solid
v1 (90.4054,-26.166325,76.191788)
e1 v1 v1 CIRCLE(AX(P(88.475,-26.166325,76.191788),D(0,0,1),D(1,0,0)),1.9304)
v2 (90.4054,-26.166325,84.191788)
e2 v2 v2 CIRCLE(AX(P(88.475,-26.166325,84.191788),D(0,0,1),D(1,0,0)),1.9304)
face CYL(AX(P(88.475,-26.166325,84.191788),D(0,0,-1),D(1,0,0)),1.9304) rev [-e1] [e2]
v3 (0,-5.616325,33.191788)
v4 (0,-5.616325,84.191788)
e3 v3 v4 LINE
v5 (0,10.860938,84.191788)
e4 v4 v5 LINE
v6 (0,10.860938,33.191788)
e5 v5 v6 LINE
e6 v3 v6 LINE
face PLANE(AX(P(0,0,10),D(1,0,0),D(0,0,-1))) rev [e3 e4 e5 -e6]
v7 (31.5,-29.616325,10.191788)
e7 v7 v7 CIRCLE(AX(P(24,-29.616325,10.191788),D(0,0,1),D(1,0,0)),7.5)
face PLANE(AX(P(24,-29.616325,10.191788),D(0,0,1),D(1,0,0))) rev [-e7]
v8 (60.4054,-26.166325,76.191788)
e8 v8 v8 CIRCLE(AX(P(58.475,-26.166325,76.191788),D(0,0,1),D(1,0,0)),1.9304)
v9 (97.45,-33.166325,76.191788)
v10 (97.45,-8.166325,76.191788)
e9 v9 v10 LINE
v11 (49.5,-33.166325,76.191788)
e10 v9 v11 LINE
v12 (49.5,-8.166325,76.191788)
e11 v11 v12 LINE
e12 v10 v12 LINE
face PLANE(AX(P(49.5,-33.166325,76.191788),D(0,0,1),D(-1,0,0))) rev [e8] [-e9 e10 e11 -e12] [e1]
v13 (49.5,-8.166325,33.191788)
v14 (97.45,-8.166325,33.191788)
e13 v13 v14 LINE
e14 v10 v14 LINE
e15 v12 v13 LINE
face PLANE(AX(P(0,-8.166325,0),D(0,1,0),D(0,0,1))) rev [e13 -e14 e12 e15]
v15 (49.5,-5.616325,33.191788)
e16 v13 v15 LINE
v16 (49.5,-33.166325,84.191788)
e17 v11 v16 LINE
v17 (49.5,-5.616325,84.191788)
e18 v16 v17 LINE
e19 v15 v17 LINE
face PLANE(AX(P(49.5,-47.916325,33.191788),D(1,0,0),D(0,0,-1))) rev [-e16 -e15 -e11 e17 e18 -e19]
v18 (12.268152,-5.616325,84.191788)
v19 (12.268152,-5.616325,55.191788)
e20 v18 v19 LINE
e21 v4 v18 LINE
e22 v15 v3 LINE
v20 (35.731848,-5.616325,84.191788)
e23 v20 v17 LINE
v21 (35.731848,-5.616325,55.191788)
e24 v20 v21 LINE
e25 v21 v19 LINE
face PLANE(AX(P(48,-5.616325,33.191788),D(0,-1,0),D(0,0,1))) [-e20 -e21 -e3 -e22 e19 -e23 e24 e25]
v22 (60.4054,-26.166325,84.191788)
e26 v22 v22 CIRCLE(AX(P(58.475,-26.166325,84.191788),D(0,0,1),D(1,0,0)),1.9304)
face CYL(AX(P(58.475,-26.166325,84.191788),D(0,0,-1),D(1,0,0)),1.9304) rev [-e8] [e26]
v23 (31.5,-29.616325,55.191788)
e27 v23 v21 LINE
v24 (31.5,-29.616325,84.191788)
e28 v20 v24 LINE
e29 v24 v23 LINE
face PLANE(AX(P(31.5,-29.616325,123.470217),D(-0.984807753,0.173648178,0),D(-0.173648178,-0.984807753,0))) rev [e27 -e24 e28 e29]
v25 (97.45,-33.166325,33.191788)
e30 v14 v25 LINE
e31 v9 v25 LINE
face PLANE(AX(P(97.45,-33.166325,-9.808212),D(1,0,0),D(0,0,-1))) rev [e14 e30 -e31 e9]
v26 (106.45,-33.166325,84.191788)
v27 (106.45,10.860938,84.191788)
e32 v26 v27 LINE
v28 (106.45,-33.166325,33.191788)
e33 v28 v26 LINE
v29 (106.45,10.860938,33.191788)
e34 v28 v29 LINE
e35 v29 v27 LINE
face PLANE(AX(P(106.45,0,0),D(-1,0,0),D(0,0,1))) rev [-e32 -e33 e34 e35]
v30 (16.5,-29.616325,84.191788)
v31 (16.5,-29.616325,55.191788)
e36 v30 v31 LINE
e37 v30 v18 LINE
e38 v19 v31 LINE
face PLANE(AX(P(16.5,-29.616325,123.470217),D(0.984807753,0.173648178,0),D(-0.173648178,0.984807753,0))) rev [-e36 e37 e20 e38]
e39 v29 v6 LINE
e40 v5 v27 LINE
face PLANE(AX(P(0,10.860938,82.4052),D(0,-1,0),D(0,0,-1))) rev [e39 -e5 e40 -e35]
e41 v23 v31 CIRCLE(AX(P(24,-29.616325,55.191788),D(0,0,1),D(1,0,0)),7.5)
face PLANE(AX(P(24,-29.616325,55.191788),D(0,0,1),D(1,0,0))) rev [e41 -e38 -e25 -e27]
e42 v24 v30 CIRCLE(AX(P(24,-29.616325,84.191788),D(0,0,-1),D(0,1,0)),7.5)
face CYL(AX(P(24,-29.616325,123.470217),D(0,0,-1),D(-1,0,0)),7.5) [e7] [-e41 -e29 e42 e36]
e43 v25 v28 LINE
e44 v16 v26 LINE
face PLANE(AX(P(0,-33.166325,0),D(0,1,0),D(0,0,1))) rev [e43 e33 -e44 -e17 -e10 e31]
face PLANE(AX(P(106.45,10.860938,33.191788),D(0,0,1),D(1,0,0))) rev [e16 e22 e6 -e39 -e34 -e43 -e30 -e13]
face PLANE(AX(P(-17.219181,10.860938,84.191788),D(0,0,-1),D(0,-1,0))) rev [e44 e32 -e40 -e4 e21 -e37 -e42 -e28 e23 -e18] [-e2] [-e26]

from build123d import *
from build123d.topology import SkipClean

# Parameters (mm, degrees)
SKETCH1_W             = 48
SKETCH1_H             = 53
BOSS_EXTRUDE1_DEPTH   = 10
SKETCH2_W             = 48
SKETCH2_H             = 5.616325
BOSS_EXTRUDE2_DEPTH   = 33.1917878
SKETCH4_W             = 4
SKETCH4_H             = 10
BOSS_EXTRUDE4_DEPTH   = 40
SKETCH5_W             = 48
SKETCH5_H             = 10.8609375
BOSS_EXTRUDE5_DEPTH   = 23.1917878
SKETCH6_W             = 48
SKETCH6_H             = 5
BOSS_EXTRUDE6_DEPTH   = 42.3
SKETCH7_W             = 12.8082122
SKETCH7_H             = 16.4772625
BOSS_EXTRUDE7_DEPTH   = 48
CUT_EXTRUDE1_REACH    = 84.426
SKETCH8_R             = 11.5
SKETCH8_R_2           = 2
FILLET1_R             = 10
FILLET2_R             = 4
SKETCH9_W             = 5
SKETCH9_H             = 16.4772625
BOSS_EXTRUDE9_DEPTH   = 48
CUT_EXTRUDE2_DEPTH    = 88.252507127
SKETCH11_W            = 51
SKETCH11_H            = 16.4772625
BOSS_EXTRUDE10_DEPTH  = 49.45
BOSS_EXTRUDE11_DEPTH  = 46
SKETCH16_W            = 47.95
SKETCH16_H            = 51
BOSS_EXTRUDE14_DEPTH  = 2.55
SKETCH14_W            = 5
SKETCH14_H            = 42.3
BOSS_EXTRUDE13_DEPTH  = 1.5
SKETCH17_W            = 51
SKETCH17_H            = 19.0272625
BOSS_EXTRUDE15_DEPTH  = 9
BOSS_EXTRUDE16_DEPTH  = 25
SKETCH19_R            = 1.9304
CUT_EXTRUDE3_DEPTH    = 125.404890183
MIRROR2_START         = 33.1917878
MIRROR2_DEPTH         = 51
MIRROR2_START_2       = 76.1917878
MIRROR2_2_OUTLINE_W   = 47.95
MIRROR2_2_OUTLINE_H   = 25
MIRROR2_2_OUTLINE_R   = 1.9304
MIRROR2_2_DEPTH       = 8
MIRROR2_3_OUTLINE_W   = 45
MIRROR2_3_OUTLINE_H   = 42.3
MIRROR2_3_OUTLINE_R   = 2
MIRROR2_3_OUTLINE_R_2 = 11.5
MIRROR2_3_DEPTH       = 5
SKETCH20_W            = 103.287975037
SKETCH20_H            = 97.84889924
CUT_EXTRUDE4_DEPTH    = 144.929961559
SKETCH21_W            = 49.5
SKETCH21_H            = 42.3
CUT_EXTRUDE5_DEPTH    = 128.391431036
SKETCH24_R            = 7.5
BOSS_EXTRUDE18_DEPTH  = 45
BOSS_EXTRUDE19_DEPTH  = 29


# Read off the part's stored shape, not the designer's step: Mirror2
with BuildPart() as part:
    # Sketch1 → Boss-Extrude1 (new body)
    with BuildSketch(Plane.XY):
        with Locations((24, 26.5)):
            Rectangle(SKETCH1_W, SKETCH1_H)
    extrude(amount=BOSS_EXTRUDE1_DEPTH)

    # Sketch2 → Boss-Extrude2 (add)
    with BuildSketch(Plane(origin=(0, 0, 0), x_dir=(-1, 0, 0), z_dir=(0, 0, -1))):
        with Locations((-24, -2.8081625)):
            Rectangle(SKETCH2_W, SKETCH2_H)
    extrude(amount=-BOSS_EXTRUDE2_DEPTH)

    # Sketch4 → Boss-Extrude4 (add)
    with BuildSketch(Plane.XY.offset(10)):
        with Locations((2, 48)):
            Rectangle(SKETCH4_W, SKETCH4_H)
        with Locations((46, 48)):
            Rectangle(SKETCH4_W, SKETCH4_H)
    extrude(amount=BOSS_EXTRUDE4_DEPTH)

    # Sketch5 → Boss-Extrude5 (add)
    with BuildSketch(Plane.XY.offset(10)):
        with Locations((24, 5.43046875)):
            Rectangle(SKETCH5_W, SKETCH5_H)
    extrude(amount=BOSS_EXTRUDE5_DEPTH)

    # Sketch6 → Boss-Extrude6 (add)
    with BuildSketch(Plane.XZ.offset(5.616325)):
        with Locations((24, 30.6917878)):
            Rectangle(SKETCH6_W, SKETCH6_H)
    extrude(amount=BOSS_EXTRUDE6_DEPTH)

    # Sketch7 → Boss-Extrude7 (add)
    with BuildSketch(Plane.ZY):
        with Locations((-6.4041061, 2.62230625)):
            Rectangle(SKETCH7_W, SKETCH7_H)
    extrude(amount=-BOSS_EXTRUDE7_DEPTH)

    # Sketch8 → Cut-Extrude1 (cut, up to next)
    with BuildSketch(Plane(origin=(0, 0, 28.1917878), x_dir=(-1, 0, 0), z_dir=(0, 0, -1)), mode=Mode.PRIVATE) as cut_extrude1_sk1:
        with Locations((-24, -26.616325)):
            Circle(SKETCH8_R)
    cut_extrude1_tool1 = extrude(cut_extrude1_sk1.sketch, amount=-CUT_EXTRUDE1_REACH, mode=Mode.PRIVATE) & part.part
    # Sketch8 → Cut-Extrude1 (cut, up to next)
    with BuildSketch(Plane(origin=(0, 0, 28.1917878), x_dir=(-1, 0, 0), z_dir=(0, 0, -1)), mode=Mode.PRIVATE) as cut_extrude1_sk2:
        with Locations((-39.5, -11.116325)):
            Circle(SKETCH8_R_2)
    cut_extrude1_tool2 = extrude(cut_extrude1_sk2.sketch, amount=-CUT_EXTRUDE1_REACH, mode=Mode.PRIVATE) & part.part
    # Sketch8 → Cut-Extrude1 (cut, up to next)
    with BuildSketch(Plane(origin=(0, 0, 28.1917878), x_dir=(-1, 0, 0), z_dir=(0, 0, -1)), mode=Mode.PRIVATE) as cut_extrude1_sk3:
        with Locations((-39.5, -42.116325)):
            Circle(SKETCH8_R_2)
    cut_extrude1_tool3 = extrude(cut_extrude1_sk3.sketch, amount=-CUT_EXTRUDE1_REACH, mode=Mode.PRIVATE) & part.part
    # Sketch8 → Cut-Extrude1 (cut, up to next)
    with BuildSketch(Plane(origin=(0, 0, 28.1917878), x_dir=(-1, 0, 0), z_dir=(0, 0, -1)), mode=Mode.PRIVATE) as cut_extrude1_sk4:
        with Locations((-8.5, -11.116325)):
            Circle(SKETCH8_R_2)
    cut_extrude1_tool4 = extrude(cut_extrude1_sk4.sketch, amount=-CUT_EXTRUDE1_REACH, mode=Mode.PRIVATE) & part.part
    # Sketch8 → Cut-Extrude1 (cut, up to next)
    with BuildSketch(Plane(origin=(0, 0, 28.1917878), x_dir=(-1, 0, 0), z_dir=(0, 0, -1)), mode=Mode.PRIVATE) as cut_extrude1_sk5:
        with Locations((-8.5, -42.116325)):
            Circle(SKETCH8_R_2)
    cut_extrude1_tool5 = extrude(cut_extrude1_sk5.sketch, amount=-CUT_EXTRUDE1_REACH, mode=Mode.PRIVATE) & part.part
    add(cut_extrude1_tool1.solids().sort_by_distance((24, -26.616325, 28.191788))[0], mode=Mode.SUBTRACT)
    add(cut_extrude1_tool2.solids().sort_by_distance((39.5, -11.116325, 28.191788))[0], mode=Mode.SUBTRACT)
    add(cut_extrude1_tool3.solids().sort_by_distance((39.5, -42.116325, 28.191788))[0], mode=Mode.SUBTRACT)
    add(cut_extrude1_tool4.solids().sort_by_distance((8.5, -11.116325, 28.191788))[0], mode=Mode.SUBTRACT)
    add(cut_extrude1_tool5.solids().sort_by_distance((8.5, -42.116325, 28.191788))[0], mode=Mode.SUBTRACT)

    # Fillet1
    fillet1_edges = [part.edges().sort_by_distance(p)[0] for p in [
        (24, 10.8609375, 0),
    ]]
    fillet(fillet1_edges, radius=FILLET1_R)

    # Fillet2
    fillet2_edges = [part.edges().sort_by_distance(p)[0] for p in [
        (2, 43, 10),
        (46, 43, 10),
    ]]
    fillet(fillet2_edges, radius=FILLET2_R)

    # Sketch9 → Boss-Extrude9 (add)
    with BuildSketch(Plane(origin=(48, 0, 0), x_dir=(0, 0, -1), z_dir=(1, 0, 0))):
        with Locations((15.3082122, 2.62230625)):
            Rectangle(SKETCH9_W, SKETCH9_H)
    extrude(amount=-BOSS_EXTRUDE9_DEPTH)

    # Sketch10 → Cut-Extrude2 (cut, through all)
    with BuildSketch(Plane(origin=(48, 0, 0), x_dir=(0, 0, -1), z_dir=(1, 0, 0))):
        Polygon((17.8082122, 10.8609375), (-33.1917878, 10.8609375), (-76.887145623, 43.902095521), (-50.794096938, 74.436514195), (27.207463492, 71.105486703), align=None)
    extrude(amount=-CUT_EXTRUDE2_DEPTH, mode=Mode.SUBTRACT)

    # Sketch11 → Boss-Extrude10 (add)
    with BuildSketch(Plane(origin=(48, 0, 0), x_dir=(0, 0, -1), z_dir=(1, 0, 0))):
        with Locations((-7.6917878, 2.62230625)):
            Rectangle(SKETCH11_W, SKETCH11_H)
    extrude(amount=BOSS_EXTRUDE10_DEPTH)

    # Sketch12 → Boss-Extrude11 (add)
    with BuildSketch(Plane(origin=(0, 0, 28.1917878), x_dir=(-1, 0, 0), z_dir=(0, 0, -1))):
        Polygon((-48, -47.916325), (-45, -47.916325), (-45, -5.616325), (-49.5, -5.616325), (-49.5, -47.916325), align=None)
    extrude(amount=BOSS_EXTRUDE11_DEPTH)

    # Sketch16 → Boss-Extrude14 (add)
    with BuildSketch(Plane.XZ.offset(5.616325)):
        with Locations((73.475, 7.6917878)):
            Rectangle(SKETCH16_W, SKETCH16_H)
    extrude(amount=BOSS_EXTRUDE14_DEPTH)

    # Sketch14 → Boss-Extrude13 (add)
    with BuildSketch(Plane(origin=(49.5, 0, 0), x_dir=(0, 0, -1), z_dir=(1, 0, 0))):
        with Locations((-30.6917878, -26.766325)):
            Rectangle(SKETCH14_W, SKETCH14_H)
    extrude(amount=-BOSS_EXTRUDE13_DEPTH)

    # Sketch17 → Boss-Extrude15 (add)
    with BuildSketch(Plane(origin=(97.45, 0, 0), x_dir=(0, 0, -1), z_dir=(1, 0, 0))):
        with Locations((-7.6917878, 1.34730625)):
            Rectangle(SKETCH17_W, SKETCH17_H)
    extrude(amount=BOSS_EXTRUDE15_DEPTH)

    # Sketch18 → Boss-Extrude16 (add)
    with BuildSketch(Plane.XZ.offset(8.166325)):
        Polygon((49.5, -17.8082122), (106.45, -17.8082122), (106.45, -9.8082122), (106.45, 33.1917878), (97.45, 33.1917878), (97.45, -9.8082122), (49.5, -9.8082122), align=None)
    extrude(amount=BOSS_EXTRUDE16_DEPTH)

    # Sketch19 → Cut-Extrude3 (cut, through all)
    with BuildSketch(Plane.XY.offset(-9.8082122)):
        with Locations((58.475, -26.166325)):
            Circle(SKETCH19_R)
        with Locations((88.475, -26.166325)):
            Circle(SKETCH19_R)
    extrude(amount=-CUT_EXTRUDE3_DEPTH, mode=Mode.SUBTRACT)

    # Mirror2 outline → Mirror2 (add)
    with BuildSketch(Plane.XY.offset(MIRROR2_START)):
        Polygon((49.5, -47.916325), (49.5, -8.166325), (97.45, -8.166325), (97.45, -33.166325), (106.45, -33.166325), (106.45, 10.8609375), (0, 10.8609375), (0, -5.616325), (45, -5.616325), (45, -47.916325), align=None)
    extrude(amount=MIRROR2_DEPTH)

    # Mirror2 2 outline → Mirror2 2 (add)
    with BuildSketch(Plane.XY.offset(MIRROR2_START_2)):
        with Locations((73.475, -20.666325)):
            Rectangle(MIRROR2_2_OUTLINE_W, MIRROR2_2_OUTLINE_H)
        with Locations((58.475, -26.166325)):
            Circle(MIRROR2_2_OUTLINE_R, mode=Mode.SUBTRACT)
        with Locations((88.475, -26.166325)):
            Circle(MIRROR2_2_OUTLINE_R, mode=Mode.SUBTRACT)
    extrude(amount=MIRROR2_2_DEPTH)

    # Mirror2 3 outline → Mirror2 3 (add)
    with SkipClean():  # the faces are left unmerged after this step: merging them gives an invalid solid
        with BuildSketch(Plane.XY.offset(MIRROR2_START)):
            with Locations((22.5, -26.766325)):
                Rectangle(MIRROR2_3_OUTLINE_W, MIRROR2_3_OUTLINE_H)
            with Locations((8.5, -42.116325)):
                Circle(MIRROR2_3_OUTLINE_R, mode=Mode.SUBTRACT)
            with Locations((39.5, -42.116325)):
                Circle(MIRROR2_3_OUTLINE_R, mode=Mode.SUBTRACT)
            with Locations((24, -26.616325)):
                Circle(MIRROR2_3_OUTLINE_R_2, mode=Mode.SUBTRACT)
            with Locations((8.5, -11.116325)):
                Circle(MIRROR2_3_OUTLINE_R, mode=Mode.SUBTRACT)
            with Locations((39.5, -11.116325)):
                Circle(MIRROR2_3_OUTLINE_R, mode=Mode.SUBTRACT)
        extrude(amount=MIRROR2_3_DEPTH)

    # Sketch20 → Cut-Extrude4 (cut, through all)
    with BuildSketch(Plane.ZY):
        with Locations((-18.452199719, -38.06351212)):
            Rectangle(SKETCH20_W, SKETCH20_H)
    extrude(amount=-CUT_EXTRUDE4_DEPTH, mode=Mode.SUBTRACT)

    # Sketch21 → Cut-Extrude5 (cut, through all)
    with BuildSketch(Plane.XY.offset(84.1917878)):
        with Locations((24.75, -26.766325)):
            Rectangle(SKETCH21_W, SKETCH21_H)
    extrude(amount=-CUT_EXTRUDE5_DEPTH, mode=Mode.SUBTRACT)



with BuildPart() as body_2:
    # Sketch24 → Boss-Extrude18 (new body)
    with BuildSketch(Plane.XY.offset(55.1917878)):
        with Locations((24, -29.616325)):
            Circle(SKETCH24_R)
    extrude(amount=-BOSS_EXTRUDE18_DEPTH)


with BuildPart() as part_1:
    add(part.part)

    add(body_2.part)  # Boss-Extrude19 merges body 2
    # Sketch25 → Boss-Extrude19 (add)
    with BuildSketch(Plane.XY.offset(55.1917878)):
        with BuildLine():
            Line((16.5, -29.616325), (12.268152463, -5.616325))
            Line((12.268152463, -5.616325), (35.731847537, -5.616325))
            Line((35.731847537, -5.616325), (31.5, -29.616325))
            ThreePointArc((31.5, -29.616325), (24, -37.116325), (16.5, -29.616325))
        make_face()
    extrude(amount=BOSS_EXTRUDE19_DEPTH)


solid = part_1.part
